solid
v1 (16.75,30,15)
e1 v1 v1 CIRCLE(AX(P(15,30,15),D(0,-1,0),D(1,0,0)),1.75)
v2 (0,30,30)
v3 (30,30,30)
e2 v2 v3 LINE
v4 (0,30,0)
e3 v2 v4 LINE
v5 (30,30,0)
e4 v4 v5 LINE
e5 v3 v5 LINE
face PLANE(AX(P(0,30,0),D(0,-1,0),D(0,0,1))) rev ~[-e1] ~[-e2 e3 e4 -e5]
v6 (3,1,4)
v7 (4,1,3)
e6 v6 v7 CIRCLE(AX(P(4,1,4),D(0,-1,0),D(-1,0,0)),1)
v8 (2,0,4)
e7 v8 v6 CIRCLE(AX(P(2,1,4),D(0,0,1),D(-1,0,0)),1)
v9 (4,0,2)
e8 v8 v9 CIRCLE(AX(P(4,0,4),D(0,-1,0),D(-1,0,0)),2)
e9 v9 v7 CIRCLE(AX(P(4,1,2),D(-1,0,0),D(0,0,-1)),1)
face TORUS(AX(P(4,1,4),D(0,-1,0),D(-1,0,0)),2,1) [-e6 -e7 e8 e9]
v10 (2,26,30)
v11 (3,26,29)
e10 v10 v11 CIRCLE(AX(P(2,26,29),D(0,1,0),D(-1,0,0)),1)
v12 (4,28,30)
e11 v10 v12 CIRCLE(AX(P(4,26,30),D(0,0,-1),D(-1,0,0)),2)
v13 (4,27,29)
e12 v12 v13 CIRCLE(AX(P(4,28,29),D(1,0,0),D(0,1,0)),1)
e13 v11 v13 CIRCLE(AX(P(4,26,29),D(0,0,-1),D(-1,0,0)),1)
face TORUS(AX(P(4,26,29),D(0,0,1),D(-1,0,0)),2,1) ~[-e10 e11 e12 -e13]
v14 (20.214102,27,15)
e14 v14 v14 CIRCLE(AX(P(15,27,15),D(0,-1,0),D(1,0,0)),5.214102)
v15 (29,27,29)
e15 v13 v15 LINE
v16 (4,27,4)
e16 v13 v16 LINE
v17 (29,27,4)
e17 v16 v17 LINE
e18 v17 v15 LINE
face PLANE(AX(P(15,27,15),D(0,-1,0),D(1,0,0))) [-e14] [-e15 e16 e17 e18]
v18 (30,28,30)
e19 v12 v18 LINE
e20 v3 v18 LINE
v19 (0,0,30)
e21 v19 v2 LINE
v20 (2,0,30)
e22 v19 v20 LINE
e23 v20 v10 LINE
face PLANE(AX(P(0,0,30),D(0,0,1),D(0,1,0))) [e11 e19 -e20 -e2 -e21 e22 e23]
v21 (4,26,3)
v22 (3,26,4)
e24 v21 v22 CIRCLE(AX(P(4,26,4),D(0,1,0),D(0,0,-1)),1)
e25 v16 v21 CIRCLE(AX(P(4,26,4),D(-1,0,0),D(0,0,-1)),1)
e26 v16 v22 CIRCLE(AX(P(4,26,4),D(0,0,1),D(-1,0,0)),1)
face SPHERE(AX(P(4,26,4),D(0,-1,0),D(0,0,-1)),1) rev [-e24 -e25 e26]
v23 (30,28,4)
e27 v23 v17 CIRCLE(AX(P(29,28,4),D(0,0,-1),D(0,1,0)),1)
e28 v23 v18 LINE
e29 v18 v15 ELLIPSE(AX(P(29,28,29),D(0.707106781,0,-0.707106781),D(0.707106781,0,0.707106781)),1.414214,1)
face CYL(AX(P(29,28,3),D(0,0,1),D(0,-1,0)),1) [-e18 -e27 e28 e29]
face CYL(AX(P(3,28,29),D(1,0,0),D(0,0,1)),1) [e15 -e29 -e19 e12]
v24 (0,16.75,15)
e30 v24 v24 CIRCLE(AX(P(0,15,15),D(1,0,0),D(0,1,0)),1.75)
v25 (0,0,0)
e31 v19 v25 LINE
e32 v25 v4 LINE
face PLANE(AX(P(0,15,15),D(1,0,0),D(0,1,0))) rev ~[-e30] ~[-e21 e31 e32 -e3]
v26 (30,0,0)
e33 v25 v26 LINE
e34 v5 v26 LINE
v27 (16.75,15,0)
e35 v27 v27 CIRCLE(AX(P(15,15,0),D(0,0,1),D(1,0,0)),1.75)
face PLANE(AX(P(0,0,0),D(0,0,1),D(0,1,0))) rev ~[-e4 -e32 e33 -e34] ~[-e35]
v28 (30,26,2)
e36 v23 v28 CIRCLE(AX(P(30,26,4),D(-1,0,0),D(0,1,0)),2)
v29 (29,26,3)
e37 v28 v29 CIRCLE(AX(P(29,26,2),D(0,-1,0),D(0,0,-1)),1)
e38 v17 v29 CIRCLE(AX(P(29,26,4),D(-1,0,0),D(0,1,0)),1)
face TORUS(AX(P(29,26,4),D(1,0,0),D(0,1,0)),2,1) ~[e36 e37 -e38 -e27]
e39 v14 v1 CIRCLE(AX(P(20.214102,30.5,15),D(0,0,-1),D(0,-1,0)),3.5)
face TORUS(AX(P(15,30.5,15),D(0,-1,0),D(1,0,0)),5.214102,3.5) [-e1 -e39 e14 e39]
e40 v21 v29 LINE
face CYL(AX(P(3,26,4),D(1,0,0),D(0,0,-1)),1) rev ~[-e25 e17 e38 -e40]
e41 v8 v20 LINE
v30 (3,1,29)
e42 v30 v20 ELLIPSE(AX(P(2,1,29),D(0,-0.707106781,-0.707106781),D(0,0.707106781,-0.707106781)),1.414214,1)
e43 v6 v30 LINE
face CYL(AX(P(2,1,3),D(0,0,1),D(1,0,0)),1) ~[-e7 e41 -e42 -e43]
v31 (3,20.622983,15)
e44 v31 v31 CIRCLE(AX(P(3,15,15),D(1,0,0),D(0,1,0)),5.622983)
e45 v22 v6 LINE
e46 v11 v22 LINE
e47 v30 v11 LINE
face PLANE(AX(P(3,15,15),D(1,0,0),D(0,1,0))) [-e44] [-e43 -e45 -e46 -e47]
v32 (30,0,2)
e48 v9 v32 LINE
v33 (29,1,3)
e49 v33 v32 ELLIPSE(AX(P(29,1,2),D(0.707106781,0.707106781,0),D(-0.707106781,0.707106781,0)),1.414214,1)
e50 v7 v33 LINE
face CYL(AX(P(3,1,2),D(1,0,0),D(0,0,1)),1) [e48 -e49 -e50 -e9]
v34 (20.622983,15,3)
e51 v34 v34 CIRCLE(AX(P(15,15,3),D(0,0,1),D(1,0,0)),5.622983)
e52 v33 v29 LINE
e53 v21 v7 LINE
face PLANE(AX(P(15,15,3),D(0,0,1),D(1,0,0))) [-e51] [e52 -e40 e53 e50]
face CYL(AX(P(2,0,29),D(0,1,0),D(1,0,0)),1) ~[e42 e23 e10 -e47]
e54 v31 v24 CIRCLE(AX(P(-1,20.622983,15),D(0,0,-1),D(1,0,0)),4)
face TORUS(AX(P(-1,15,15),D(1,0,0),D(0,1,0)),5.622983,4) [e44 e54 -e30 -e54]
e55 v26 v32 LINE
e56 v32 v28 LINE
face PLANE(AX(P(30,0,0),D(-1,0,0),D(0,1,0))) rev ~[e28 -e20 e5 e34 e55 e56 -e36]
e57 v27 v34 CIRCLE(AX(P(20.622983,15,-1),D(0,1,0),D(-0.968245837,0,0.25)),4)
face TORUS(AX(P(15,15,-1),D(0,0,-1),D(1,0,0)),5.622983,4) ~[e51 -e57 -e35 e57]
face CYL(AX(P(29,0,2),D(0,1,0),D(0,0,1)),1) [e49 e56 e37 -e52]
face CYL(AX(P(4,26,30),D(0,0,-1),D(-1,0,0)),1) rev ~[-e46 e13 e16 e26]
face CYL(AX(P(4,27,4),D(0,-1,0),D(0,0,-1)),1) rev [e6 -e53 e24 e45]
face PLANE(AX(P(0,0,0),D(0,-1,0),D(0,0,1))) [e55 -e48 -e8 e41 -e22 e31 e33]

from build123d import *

# Parameters (mm, degrees)
F1_W     = 30
F1_H     = 30
F1_R     = 1.75
F2_DEPTH = 3
F0_W     = 30
F0_H     = 30
F0_R     = 1.75
F3_DEPTH = 3
F5_W     = 30
F5_H     = 30
F5_R     = 1.75
F6_DEPTH = 3
F7_R     = 1


# Not quite as in the source:
# - a fillet or chamfer that OpenCascade refuses, or shapes differently, is made with other operations: its cross-section is extruded or revolved along the edge and cut away or added


with BuildPart() as f2:
    # F1 (on Right) → F2 (new body)
    with BuildSketch(Plane.YZ):
        with Locations((15, 15)):
            Rectangle(F1_W, F1_H)
        with Locations((15, 15)):
            Circle(F1_R, mode=Mode.SUBTRACT)
    extrude(amount=F2_DEPTH)

    # F0 (on Top) → F3 (join)
    with BuildSketch(Plane.XY):
        with Locations((15, 15)):
            Rectangle(F0_W, F0_H)
        with Locations((15, 15)):
            Circle(F0_R, mode=Mode.SUBTRACT)
    extrude(amount=F3_DEPTH)

    # F5 (on face) → F6 (join)
    with BuildSketch(Plane.XZ.offset(-30)):
        with Locations((15, 15)):
            Rectangle(F5_W, F5_H)
        with Locations((15, 15)):
            Circle(F5_R, mode=Mode.SUBTRACT)
    extrude(amount=F6_DEPTH)

    # F7
    f7_edges = [f2.edges().sort_by_distance(p)[0] for p in [
        (3, 13.5, 3),
        (3, 13.5, 30),
        (30, 13.5, 3),
        (3, 0, 16.5),
        (16.5, 0, 3),
        (16.5, 27, 3),
        (16.5, 27, 30),
        (3, 27, 16.5),
        (30, 27, 16.5),
    ]]
    fillet(f7_edges, radius=F7_R)

    # F8: fillet of radius 4 on 1 edges, made by hand

    # F8_s1 → F8_t2 (revolve, cut)
    with BuildSketch(Plane.XZ.offset(-15)):
        with BuildLine():
            ThreePointArc((16.75, 0), (18.1734936034, 2.1622776602), (20.6229833462, 3))
            Line((20.6229833462, 3), (16.75, 3))
            Line((16.75, 3), (16.75, 0))
        make_face()
    revolve(axis=Axis((15, 15, 3), (0, 0, 1)), mode=Mode.SUBTRACT)

    # F9: fillet of radius 4 on 1 edges, made by hand

    # F9_s1 → F9_t2 (revolve, cut)
    with BuildSketch(Plane.XY.offset(15)):
        with BuildLine():
            ThreePointArc((3, 20.6229833462), (2.1622776602, 18.1734936034), (0, 16.75))
            Line((0, 16.75), (3, 16.75))
            Line((3, 16.75), (3, 20.6229833462))
        make_face()
    revolve(axis=Axis((3, 15, 15), (1, 0, 0)), mode=Mode.SUBTRACT)

    # F10: fillet of radius 3.5 on 1 edges, made by hand

    # F10_s1 → F10_t2 (revolve, cut)
    with BuildSketch(Plane.XY.offset(15)):
        with BuildLine():
            ThreePointArc((20.2141016151, 27), (17.9228137677, 27.8542486889), (16.75, 30))
            Line((16.75, 30), (16.75, 27))
            Line((16.75, 27), (20.2141016151, 27))
        make_face()
    revolve(axis=Axis((15, 27, 15), (0, -1, 0)), mode=Mode.SUBTRACT)


solid = f2.part
